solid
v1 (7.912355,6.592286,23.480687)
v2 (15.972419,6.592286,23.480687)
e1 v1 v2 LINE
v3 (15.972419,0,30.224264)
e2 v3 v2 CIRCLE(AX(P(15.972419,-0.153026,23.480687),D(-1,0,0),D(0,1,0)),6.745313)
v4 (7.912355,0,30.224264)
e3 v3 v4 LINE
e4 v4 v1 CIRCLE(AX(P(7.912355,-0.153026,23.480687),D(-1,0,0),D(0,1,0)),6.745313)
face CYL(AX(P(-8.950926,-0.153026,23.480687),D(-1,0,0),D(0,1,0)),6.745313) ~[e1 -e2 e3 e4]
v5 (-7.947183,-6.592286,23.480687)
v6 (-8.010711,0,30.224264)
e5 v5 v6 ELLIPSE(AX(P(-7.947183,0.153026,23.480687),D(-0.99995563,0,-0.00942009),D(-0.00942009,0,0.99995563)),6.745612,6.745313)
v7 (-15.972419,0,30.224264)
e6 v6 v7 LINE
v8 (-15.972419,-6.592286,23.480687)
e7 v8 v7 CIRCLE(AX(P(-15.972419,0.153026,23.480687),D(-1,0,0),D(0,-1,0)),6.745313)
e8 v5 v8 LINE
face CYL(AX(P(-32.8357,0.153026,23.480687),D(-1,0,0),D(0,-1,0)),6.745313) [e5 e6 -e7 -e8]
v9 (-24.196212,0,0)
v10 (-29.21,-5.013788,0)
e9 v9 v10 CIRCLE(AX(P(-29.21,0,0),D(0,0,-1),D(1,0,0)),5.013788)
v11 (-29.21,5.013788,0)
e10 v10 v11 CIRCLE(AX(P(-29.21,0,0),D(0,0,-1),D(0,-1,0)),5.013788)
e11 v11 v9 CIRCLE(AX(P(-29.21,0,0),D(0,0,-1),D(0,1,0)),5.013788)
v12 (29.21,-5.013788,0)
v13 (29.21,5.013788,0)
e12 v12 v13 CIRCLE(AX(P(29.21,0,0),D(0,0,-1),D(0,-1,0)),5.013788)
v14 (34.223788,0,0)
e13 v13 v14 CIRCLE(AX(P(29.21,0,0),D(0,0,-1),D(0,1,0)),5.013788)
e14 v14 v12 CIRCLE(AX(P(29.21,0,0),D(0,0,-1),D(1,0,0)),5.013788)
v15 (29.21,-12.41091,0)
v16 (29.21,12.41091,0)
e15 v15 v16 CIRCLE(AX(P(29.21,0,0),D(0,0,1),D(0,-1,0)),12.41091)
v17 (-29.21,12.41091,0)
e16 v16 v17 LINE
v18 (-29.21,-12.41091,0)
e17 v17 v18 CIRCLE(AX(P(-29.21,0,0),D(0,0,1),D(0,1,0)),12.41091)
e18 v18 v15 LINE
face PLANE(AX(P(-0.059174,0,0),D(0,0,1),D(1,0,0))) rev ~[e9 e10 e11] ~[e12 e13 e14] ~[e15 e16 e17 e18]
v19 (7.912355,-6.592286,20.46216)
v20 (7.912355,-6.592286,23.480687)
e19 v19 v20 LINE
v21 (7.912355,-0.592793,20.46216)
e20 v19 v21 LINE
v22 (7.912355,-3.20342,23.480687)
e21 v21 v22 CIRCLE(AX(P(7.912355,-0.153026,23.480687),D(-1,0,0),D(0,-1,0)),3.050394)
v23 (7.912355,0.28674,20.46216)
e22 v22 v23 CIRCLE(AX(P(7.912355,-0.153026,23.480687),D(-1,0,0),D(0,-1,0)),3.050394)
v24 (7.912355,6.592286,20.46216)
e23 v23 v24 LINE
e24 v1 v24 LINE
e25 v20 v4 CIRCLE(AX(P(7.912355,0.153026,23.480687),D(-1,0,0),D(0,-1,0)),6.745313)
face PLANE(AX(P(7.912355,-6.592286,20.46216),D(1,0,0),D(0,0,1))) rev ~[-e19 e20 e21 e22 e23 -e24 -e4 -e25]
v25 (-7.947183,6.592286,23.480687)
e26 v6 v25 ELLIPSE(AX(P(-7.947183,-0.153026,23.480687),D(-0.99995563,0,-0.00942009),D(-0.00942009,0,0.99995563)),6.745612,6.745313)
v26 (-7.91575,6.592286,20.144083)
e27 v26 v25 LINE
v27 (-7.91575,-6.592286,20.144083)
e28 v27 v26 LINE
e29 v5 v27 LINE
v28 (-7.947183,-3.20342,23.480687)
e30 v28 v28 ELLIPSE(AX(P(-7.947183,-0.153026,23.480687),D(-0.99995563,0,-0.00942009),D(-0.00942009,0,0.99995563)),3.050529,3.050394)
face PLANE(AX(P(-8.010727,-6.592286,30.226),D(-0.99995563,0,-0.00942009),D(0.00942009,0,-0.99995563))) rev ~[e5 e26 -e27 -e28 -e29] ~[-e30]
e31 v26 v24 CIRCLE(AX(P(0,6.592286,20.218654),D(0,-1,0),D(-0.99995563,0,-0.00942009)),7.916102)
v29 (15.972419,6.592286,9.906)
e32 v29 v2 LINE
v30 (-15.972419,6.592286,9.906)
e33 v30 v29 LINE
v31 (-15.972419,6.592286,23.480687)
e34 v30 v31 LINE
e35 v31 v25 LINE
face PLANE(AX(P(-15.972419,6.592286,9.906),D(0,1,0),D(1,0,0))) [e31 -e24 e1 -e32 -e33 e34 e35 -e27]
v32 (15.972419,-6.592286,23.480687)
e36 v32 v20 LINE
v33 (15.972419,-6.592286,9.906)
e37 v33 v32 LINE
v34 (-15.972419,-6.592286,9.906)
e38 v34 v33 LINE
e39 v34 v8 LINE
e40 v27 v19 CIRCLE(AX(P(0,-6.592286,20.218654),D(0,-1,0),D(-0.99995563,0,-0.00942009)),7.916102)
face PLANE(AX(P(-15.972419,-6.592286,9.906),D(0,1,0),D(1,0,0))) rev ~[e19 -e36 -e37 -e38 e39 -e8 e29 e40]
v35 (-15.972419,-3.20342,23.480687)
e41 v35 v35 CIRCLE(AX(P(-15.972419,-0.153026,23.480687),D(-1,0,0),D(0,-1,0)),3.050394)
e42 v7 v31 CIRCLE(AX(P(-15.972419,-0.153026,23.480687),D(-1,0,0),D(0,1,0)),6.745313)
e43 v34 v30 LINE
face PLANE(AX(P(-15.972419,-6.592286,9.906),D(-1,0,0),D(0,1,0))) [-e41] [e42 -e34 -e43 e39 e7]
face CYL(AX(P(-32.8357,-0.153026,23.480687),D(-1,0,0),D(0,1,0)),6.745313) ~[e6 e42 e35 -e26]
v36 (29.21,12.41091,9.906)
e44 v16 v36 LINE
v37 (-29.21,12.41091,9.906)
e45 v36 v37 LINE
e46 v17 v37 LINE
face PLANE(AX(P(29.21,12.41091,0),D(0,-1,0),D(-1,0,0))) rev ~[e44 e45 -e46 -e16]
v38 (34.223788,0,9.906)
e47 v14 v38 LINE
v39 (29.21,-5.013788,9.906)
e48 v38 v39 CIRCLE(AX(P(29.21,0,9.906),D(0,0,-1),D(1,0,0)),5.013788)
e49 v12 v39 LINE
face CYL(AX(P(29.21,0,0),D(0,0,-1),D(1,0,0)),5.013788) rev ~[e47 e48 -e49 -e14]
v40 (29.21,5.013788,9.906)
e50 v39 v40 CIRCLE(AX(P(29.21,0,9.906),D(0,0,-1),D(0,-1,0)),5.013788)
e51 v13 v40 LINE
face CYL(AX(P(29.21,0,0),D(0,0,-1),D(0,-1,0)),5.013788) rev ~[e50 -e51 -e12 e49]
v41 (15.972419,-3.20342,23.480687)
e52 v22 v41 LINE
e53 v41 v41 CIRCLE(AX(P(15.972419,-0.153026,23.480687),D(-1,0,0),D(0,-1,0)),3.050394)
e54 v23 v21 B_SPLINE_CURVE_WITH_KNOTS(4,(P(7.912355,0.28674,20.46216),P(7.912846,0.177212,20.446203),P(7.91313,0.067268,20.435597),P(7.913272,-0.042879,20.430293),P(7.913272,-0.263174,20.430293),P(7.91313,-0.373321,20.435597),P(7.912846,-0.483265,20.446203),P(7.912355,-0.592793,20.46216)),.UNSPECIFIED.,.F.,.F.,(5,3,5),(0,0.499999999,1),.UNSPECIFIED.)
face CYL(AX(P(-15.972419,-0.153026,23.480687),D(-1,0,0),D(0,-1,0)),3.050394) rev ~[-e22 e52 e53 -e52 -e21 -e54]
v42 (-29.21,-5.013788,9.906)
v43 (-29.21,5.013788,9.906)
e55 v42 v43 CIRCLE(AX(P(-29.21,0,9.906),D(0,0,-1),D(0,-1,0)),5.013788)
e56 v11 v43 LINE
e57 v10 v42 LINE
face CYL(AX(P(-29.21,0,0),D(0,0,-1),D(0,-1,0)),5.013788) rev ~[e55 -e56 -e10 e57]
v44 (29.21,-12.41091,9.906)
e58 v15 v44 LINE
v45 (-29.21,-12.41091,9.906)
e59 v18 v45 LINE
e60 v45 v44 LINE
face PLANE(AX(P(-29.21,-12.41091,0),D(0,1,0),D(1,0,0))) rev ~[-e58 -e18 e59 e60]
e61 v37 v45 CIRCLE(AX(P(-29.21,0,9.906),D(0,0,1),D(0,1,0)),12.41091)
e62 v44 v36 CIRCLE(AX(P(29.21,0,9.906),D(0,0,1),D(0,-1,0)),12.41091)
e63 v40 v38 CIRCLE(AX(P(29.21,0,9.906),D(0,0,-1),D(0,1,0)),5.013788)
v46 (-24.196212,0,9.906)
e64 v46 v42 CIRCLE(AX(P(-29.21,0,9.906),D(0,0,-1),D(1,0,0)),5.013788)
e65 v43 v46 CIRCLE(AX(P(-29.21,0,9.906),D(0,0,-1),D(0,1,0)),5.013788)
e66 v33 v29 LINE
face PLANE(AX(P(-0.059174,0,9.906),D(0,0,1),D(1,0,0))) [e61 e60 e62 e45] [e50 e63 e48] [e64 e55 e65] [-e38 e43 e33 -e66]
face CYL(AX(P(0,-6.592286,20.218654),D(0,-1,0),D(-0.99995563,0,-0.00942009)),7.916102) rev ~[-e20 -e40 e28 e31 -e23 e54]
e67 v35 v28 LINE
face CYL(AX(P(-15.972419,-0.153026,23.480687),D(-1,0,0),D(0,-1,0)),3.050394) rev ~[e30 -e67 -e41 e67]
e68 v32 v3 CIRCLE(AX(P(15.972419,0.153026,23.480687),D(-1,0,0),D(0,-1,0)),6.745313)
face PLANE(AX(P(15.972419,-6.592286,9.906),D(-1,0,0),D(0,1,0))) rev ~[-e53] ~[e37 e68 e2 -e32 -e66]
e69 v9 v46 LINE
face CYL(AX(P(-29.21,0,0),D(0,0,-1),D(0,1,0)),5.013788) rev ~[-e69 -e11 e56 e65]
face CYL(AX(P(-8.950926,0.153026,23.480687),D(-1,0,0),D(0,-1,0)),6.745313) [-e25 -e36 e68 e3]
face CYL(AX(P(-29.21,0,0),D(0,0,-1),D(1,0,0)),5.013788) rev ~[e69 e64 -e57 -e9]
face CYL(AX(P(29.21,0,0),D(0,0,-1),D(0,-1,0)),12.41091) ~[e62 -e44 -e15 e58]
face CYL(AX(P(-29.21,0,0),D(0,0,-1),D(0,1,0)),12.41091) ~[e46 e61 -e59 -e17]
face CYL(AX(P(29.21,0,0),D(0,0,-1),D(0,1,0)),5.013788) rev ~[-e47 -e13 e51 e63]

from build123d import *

# Parameters (mm, degrees)
F1_DEPTH    = 9.906
F2_W        = 31.9448374212
F2_H        = 13.18457257
F3_DEPTH    = 20.32
F5_DEPTH    = 25.4
F6_T1_DEPTH = 41.6882551367
F6_T3_DEPTH = 41.7866267939
F7_R        = 3.0503938931
F8_DEPTH    = 57.5943291351


# Not quite as in the source:
# - a fillet or chamfer that OpenCascade refuses, or shapes differently, is made with other operations: its cross-section is extruded or revolved along the edge and cut away or added


with BuildPart() as f1:
    # F0 (on Top) → F1 (new body)
    with BuildSketch(Plane.XY):
        with BuildLine():
            Line((-29.21, -12.4109104246), (29.21, -12.4109104246))
            Line((29.21, -12.4109104246), (29.21, -5.0137877216))
            ThreePointArc((29.21, -5.0137877216), (24.1962122784, 0), (29.21, 5.0137877216))
            Line((29.21, 5.0137877216), (29.21, 12.4109104246))
            Line((29.21, 12.4109104246), (-29.21, 12.4109104246))
            Line((-29.21, 12.4109104246), (-29.21, 5.0137877216))
            ThreePointArc((-29.21, 5.0137877216), (-25.6647167027, 3.5452832973), (-24.1962122784, 0))
            ThreePointArc((-24.1962122784, 0), (-25.6647167027, -3.5452832973), (-29.21, -5.0137877216))
            Line((-29.21, -5.0137877216), (-29.21, -12.4109104246))
        make_face()
        with BuildLine():
            ThreePointArc((-29.21, 12.4109104246), (-41.6209104246, 0), (-29.21, -12.4109104246))
            Line((-29.21, -12.4109104246), (-29.21, -5.0137877216))
            ThreePointArc((-29.21, -5.0137877216), (-34.2237877216, 0), (-29.21, 5.0137877216))
            Line((-29.21, 5.0137877216), (-29.21, 12.4109104246))
        make_face()
        with BuildLine():
            Line((29.21, -5.0137877216), (29.21, -12.4109104246))
            ThreePointArc((29.21, -12.4109104246), (41.6209104246, 0), (29.21, 12.4109104246))
            Line((29.21, 12.4109104246), (29.21, 5.0137877216))
            ThreePointArc((29.21, 5.0137877216), (32.7552832973, 3.5452832973), (34.2237877216, 0))
            ThreePointArc((34.2237877216, 0), (32.7552832973, -3.5452832973), (29.21, -5.0137877216))
        make_face()
    extrude(amount=F1_DEPTH)

    # F2 (on face) → F3 (join)
    with BuildSketch(Plane.XY.offset(9.906)):
        Rectangle(F2_W, F2_H)
    extrude(amount=F3_DEPTH)

    # F4 (on face) → F5 (cut)
    with BuildSketch(Plane.XZ.offset(6.592286285)):
        with BuildLine():
            Line((-8.0107270402, 30.226), (-7.9157502647, 20.1440832174))
            ThreePointArc((-7.9157502647, 20.1440832174), (0.1590473721, 12.3041500236), (7.912355383, 20.462159845))
            Line((7.912355383, 20.462159845), (7.912355383, 30.226))
            Line((7.912355383, 30.226), (-8.0107270402, 30.226))
        make_face()
    extrude(amount=-F5_DEPTH, mode=Mode.SUBTRACT)

    # F6: fillet of radius 6.7453126933 on 4 edges, made by hand

    # F6_s2 → F6_t1 (cut)
    with BuildSketch(Plane.YZ.offset(-32.8357004438)):
        with BuildLine():
            ThreePointArc((-6.592286285, 23.4806873067), (-4.6166299384, 28.2503436534), (0.1530264083, 30.226))
            Line((0.1530264083, 30.226), (-6.592286285, 30.226))
            Line((-6.592286285, 30.226), (-6.592286285, 23.4806873067))
        make_face()
        with BuildLine():
            ThreePointArc((6.592286285, 23.4806873067), (4.6166299384, 28.2503436534), (-0.1530264083, 30.226))
            Line((-0.1530264083, 30.226), (6.592286285, 30.226))
            Line((6.592286285, 30.226), (6.592286285, 23.4806873067))
        make_face()
    extrude(amount=F6_T1_DEPTH, mode=Mode.SUBTRACT)

    # F6_s4 → F6_t3 (cut)
    with BuildSketch(Plane.YZ.offset(-8.9509263502)):
        with BuildLine():
            ThreePointArc((-6.592286285, 23.4806873067), (-4.6166299384, 28.2503436534), (0.1530264083, 30.226))
            Line((0.1530264083, 30.226), (-6.592286285, 30.226))
            Line((-6.592286285, 30.226), (-6.592286285, 23.4806873067))
        make_face()
        with BuildLine():
            ThreePointArc((6.592286285, 23.4806873067), (4.6166299384, 28.2503436534), (-0.1530264083, 30.226))
            Line((-0.1530264083, 30.226), (6.592286285, 30.226))
            Line((6.592286285, 30.226), (6.592286285, 23.4806873067))
        make_face()
    extrude(amount=F6_T3_DEPTH, mode=Mode.SUBTRACT)

    # F7 (on face) → F8 (cut, through all)
    with BuildSketch(Plane(origin=(-15.9724187106, 0, 0), x_dir=(0, -1, 0), z_dir=(-1, 0, 0))):
        with Locations((0.1530264083, 23.4806873067)):
            Circle(F7_R)
    extrude(amount=-F8_DEPTH, mode=Mode.SUBTRACT)


solid = f1.part
